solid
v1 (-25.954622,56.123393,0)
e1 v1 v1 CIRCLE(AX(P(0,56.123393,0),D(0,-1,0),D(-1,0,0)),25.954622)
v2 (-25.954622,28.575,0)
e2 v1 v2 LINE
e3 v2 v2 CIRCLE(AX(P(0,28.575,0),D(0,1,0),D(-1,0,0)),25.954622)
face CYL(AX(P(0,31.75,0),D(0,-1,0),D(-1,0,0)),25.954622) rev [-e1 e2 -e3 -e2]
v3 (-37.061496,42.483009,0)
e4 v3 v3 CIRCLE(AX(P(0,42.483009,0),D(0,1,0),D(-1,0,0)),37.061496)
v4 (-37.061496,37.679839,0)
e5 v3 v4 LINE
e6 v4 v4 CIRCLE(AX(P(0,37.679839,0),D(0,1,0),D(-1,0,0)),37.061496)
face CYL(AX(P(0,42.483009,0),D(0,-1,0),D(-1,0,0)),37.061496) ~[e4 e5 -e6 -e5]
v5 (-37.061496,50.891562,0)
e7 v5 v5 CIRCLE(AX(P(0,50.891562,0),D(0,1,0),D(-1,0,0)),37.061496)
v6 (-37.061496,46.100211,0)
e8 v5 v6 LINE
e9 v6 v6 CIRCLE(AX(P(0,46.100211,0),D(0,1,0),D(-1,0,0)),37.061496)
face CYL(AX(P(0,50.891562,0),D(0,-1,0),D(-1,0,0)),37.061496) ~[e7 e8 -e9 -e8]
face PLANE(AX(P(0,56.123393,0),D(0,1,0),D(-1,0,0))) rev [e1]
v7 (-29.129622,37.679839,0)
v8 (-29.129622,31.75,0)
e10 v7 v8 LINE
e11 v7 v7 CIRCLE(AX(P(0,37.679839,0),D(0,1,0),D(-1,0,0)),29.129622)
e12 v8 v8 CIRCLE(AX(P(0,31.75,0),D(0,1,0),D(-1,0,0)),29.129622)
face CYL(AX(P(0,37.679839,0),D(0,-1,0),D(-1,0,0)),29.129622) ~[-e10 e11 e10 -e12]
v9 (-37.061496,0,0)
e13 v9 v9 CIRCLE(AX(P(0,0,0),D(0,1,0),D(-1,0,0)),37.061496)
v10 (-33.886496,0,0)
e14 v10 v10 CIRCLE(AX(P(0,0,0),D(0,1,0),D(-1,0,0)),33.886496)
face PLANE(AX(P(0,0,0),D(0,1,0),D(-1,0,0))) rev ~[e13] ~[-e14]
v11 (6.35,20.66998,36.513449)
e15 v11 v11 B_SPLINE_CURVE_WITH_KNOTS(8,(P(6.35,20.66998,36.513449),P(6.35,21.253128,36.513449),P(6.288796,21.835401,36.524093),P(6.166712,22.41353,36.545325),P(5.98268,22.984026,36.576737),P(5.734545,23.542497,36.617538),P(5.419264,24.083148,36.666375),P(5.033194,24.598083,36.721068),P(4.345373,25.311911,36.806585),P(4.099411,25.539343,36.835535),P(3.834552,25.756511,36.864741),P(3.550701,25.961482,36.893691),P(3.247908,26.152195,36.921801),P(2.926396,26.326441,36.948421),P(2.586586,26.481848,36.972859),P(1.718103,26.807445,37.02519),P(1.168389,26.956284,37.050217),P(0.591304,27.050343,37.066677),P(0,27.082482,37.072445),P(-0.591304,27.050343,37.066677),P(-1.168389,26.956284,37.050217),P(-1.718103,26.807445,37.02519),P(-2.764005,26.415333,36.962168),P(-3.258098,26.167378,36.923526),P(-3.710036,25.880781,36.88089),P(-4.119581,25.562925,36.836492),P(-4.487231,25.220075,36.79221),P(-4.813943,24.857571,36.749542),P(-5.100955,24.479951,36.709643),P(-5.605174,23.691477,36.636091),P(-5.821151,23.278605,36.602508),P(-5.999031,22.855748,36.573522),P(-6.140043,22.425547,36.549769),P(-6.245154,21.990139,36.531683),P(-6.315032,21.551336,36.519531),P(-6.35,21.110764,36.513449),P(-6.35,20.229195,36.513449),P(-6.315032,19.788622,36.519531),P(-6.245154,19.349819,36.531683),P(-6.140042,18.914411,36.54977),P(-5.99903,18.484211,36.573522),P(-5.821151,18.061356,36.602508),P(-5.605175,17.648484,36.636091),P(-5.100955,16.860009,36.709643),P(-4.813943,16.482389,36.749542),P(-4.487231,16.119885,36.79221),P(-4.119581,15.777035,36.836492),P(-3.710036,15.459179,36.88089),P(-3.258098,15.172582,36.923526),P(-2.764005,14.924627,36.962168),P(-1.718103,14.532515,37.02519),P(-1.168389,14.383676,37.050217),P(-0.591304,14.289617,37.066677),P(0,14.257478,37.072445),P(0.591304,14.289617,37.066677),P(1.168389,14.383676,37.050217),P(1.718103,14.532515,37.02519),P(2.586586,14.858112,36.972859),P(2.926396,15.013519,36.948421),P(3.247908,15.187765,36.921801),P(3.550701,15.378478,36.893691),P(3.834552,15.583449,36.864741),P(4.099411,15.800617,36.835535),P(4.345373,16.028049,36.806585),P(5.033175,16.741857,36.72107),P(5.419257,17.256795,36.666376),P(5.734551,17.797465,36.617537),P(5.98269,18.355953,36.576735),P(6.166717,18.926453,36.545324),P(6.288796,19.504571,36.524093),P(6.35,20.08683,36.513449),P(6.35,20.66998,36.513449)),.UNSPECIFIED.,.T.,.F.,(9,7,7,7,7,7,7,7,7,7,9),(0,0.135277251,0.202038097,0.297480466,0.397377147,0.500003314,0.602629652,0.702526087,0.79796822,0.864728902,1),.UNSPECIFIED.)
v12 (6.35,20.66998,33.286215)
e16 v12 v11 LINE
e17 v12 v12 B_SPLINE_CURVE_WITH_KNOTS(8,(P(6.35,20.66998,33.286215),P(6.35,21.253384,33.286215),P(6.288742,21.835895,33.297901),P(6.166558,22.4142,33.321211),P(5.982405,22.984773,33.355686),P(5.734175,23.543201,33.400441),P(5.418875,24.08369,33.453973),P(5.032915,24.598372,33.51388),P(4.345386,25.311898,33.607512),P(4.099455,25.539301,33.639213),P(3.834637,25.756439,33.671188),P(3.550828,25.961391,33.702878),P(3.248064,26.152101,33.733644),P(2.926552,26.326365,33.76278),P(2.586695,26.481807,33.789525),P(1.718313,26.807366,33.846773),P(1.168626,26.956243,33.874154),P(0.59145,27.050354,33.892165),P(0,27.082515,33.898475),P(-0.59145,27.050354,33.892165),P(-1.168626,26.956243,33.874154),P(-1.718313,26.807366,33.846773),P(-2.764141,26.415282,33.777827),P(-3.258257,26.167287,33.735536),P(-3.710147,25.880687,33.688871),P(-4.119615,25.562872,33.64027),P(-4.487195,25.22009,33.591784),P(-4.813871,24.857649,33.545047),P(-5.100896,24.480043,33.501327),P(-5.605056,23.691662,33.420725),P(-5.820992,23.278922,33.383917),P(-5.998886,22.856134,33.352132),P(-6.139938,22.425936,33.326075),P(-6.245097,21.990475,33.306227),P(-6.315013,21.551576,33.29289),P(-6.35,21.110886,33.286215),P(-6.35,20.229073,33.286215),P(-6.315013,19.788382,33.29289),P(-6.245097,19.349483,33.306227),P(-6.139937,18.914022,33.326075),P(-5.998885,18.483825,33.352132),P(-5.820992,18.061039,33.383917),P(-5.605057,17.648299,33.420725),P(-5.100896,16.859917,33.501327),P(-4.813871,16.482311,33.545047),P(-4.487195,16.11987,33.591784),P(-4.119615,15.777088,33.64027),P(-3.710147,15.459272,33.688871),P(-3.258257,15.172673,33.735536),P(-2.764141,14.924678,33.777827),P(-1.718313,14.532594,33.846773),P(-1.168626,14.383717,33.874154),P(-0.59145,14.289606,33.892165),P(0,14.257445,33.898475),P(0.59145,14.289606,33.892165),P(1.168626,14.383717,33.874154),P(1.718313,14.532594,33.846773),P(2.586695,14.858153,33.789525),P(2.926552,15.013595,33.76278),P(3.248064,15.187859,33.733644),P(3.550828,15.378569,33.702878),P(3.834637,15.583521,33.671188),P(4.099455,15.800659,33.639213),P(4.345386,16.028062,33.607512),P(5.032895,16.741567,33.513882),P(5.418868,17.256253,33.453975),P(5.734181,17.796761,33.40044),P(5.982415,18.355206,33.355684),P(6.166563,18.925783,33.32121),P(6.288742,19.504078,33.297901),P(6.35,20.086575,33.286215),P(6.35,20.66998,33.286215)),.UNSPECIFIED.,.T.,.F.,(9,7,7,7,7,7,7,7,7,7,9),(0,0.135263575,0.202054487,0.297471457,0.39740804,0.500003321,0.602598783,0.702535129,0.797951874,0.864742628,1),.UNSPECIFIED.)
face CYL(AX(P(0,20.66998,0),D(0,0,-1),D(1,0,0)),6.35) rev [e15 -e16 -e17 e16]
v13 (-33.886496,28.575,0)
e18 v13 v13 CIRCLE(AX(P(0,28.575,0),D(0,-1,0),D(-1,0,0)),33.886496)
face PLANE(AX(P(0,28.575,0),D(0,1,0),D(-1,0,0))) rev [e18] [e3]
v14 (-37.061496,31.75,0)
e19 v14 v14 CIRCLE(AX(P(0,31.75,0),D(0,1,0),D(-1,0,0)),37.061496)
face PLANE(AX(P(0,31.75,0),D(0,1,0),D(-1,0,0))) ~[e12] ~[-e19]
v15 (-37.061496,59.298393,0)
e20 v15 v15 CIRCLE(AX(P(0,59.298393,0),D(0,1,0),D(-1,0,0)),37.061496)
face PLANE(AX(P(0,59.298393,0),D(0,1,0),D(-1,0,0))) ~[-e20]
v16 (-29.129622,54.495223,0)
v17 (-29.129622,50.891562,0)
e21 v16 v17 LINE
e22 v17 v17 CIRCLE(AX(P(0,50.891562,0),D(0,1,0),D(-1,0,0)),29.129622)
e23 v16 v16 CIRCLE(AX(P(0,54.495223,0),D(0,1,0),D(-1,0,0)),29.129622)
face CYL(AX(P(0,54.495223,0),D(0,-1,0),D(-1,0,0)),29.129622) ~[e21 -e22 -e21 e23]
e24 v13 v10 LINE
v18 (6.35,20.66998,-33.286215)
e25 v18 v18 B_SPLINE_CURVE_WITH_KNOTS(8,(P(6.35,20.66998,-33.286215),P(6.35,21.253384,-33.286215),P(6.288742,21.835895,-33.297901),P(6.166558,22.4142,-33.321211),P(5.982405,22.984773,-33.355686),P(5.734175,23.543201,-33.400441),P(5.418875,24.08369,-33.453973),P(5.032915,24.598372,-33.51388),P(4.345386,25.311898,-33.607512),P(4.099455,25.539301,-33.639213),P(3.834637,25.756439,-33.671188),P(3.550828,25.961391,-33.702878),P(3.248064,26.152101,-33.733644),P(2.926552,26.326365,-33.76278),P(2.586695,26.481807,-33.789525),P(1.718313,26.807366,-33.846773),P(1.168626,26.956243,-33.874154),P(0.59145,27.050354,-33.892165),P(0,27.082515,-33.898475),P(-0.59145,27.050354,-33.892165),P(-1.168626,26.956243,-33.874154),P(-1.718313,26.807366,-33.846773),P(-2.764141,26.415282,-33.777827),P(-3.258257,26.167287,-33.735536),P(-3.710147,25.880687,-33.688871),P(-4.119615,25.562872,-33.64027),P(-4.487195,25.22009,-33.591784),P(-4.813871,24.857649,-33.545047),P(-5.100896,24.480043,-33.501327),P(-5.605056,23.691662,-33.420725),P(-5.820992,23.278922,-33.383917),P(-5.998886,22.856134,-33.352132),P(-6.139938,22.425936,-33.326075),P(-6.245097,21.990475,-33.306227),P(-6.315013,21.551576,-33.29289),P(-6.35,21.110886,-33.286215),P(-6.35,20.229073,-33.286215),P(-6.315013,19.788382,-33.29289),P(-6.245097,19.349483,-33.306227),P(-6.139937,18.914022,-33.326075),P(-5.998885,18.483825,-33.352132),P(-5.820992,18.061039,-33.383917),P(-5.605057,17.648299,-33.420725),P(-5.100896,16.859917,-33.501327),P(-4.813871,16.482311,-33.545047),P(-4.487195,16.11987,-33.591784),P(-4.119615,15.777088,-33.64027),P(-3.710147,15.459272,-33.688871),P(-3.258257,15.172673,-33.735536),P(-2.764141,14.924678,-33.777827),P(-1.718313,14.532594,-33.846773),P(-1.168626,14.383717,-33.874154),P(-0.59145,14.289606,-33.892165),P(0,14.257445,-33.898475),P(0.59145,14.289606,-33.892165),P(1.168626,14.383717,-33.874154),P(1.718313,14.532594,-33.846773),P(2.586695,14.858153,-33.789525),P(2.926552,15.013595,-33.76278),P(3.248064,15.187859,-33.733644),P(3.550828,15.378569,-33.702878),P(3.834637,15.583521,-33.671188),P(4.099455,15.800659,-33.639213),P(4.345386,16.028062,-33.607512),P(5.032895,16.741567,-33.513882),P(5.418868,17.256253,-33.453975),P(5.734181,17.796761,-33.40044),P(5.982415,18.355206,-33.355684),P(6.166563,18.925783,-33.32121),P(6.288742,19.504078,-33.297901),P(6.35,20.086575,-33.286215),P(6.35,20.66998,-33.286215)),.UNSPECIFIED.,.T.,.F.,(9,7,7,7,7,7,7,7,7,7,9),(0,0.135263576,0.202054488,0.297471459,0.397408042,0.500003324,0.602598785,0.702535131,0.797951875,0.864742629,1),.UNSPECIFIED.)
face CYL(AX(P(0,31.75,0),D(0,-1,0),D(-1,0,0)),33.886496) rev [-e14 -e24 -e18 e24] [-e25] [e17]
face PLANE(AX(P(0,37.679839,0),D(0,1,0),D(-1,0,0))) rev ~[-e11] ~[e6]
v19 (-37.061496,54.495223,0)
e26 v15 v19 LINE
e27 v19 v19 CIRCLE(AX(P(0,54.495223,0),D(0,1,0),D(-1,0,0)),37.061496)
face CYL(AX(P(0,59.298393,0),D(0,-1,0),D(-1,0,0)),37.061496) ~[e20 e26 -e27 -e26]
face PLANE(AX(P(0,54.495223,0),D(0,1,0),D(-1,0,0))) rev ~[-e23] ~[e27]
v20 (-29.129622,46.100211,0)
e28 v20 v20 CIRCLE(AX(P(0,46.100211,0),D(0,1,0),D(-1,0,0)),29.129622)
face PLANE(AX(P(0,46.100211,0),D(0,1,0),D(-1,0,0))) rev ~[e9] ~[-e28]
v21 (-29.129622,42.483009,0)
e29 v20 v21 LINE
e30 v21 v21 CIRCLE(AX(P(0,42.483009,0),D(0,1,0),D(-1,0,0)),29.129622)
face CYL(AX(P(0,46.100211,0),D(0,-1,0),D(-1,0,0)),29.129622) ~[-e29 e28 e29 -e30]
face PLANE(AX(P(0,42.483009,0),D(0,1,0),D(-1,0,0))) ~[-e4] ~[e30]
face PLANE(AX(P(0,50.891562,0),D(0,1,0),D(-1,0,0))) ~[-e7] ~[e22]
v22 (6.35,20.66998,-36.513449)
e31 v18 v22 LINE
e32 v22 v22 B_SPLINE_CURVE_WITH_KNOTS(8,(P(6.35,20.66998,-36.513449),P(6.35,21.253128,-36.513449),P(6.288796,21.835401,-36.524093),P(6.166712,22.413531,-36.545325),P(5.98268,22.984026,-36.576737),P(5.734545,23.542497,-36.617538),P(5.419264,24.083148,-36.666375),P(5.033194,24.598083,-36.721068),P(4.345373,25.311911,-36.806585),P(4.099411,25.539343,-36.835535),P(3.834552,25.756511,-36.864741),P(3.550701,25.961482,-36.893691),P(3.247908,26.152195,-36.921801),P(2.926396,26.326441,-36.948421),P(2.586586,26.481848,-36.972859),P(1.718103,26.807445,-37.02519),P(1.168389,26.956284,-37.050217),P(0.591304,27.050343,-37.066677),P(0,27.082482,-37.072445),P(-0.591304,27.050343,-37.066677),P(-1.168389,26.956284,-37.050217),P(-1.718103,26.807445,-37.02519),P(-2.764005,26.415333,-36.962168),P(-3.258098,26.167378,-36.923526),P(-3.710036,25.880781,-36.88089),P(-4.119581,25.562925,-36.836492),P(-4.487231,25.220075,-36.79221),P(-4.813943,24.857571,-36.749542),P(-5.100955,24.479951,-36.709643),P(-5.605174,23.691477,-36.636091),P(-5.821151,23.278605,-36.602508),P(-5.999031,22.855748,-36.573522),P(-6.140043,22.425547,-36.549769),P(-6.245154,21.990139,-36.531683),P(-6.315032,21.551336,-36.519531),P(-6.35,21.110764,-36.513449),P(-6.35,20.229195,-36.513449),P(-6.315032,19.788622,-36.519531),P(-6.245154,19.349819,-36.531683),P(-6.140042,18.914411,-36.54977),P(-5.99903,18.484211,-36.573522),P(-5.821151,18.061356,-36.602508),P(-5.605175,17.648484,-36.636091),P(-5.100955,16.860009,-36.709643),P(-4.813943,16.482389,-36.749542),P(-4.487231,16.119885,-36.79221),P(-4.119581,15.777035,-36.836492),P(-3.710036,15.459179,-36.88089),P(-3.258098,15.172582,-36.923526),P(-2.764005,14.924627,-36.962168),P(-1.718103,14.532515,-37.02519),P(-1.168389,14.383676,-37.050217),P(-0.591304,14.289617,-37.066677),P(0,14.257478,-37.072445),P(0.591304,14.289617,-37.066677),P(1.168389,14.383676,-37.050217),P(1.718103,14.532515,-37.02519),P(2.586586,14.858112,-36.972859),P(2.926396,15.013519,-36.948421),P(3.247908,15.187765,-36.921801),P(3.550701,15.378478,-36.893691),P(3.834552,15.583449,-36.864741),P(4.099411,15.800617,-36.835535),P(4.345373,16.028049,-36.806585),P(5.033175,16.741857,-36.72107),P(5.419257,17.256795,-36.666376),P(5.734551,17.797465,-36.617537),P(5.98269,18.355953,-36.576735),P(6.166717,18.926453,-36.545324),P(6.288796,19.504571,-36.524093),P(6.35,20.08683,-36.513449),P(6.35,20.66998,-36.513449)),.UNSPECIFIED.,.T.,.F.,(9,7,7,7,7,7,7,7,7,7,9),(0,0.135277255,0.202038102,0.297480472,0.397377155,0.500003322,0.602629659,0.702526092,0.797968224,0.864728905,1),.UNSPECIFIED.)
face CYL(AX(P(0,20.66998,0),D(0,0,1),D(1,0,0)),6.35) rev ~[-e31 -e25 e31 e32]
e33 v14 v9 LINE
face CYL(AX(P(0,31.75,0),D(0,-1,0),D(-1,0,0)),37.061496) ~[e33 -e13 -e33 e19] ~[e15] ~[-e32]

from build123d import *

# Parameters (mm, degrees)
F2_T     = 3.175
F3_R     = 6.35
F4_DEPTH = 64.008
F5_DEPTH = 104.14


# Not quite as in the source:
# - a shell that OpenCascade refuses in one call is made with other operations: the cavity is built on its own and cut out


with BuildPart() as f1:
    # F0 (on Top) → F1 (revolve)
    with BuildSketch(Plane.XY):
        Polygon((-37.0614958425, 0), (0, 0), (0, 59.2983933481), (-37.0614958425, 59.2983933481), (-37.0614958425, 54.4952234869), (-29.1296224819, 54.4952234869), (-29.1296224819, 50.8915618087), (-37.0614958425, 50.8915618087), (-37.0614958425, 46.1002111902), (-29.1296224819, 46.1002111902), (-29.1296224819, 42.483009196), (-37.0614958425, 42.483009196), (-37.0614958425, 37.6798393348), (-29.1296224819, 37.6798393348), (-29.1296224819, 31.75), (-37.0614958425, 31.75), align=None)
    revolve(axis=Axis((0, 29.649196674, 0), (0, 1, 0)))

    # F2: shell of thickness 3.175, made by hand


with BuildPart() as f2_core1:
    # F2_t2: copy of F1
    add(f1.part)

    # the walls: a layer under each face that stays
    f2_faces = [f2_core1.faces().sort_by_distance(p)[0] for p in [
        (29.1296224819, 34.7149196674, 0),
        (-24.707663895, 31.75, -24.707663895),
        (37.0614958425, 15.875, 0),
        (0, 59.2983933481, 0),
        (37.0614958425, 56.8968084175, 0),
        (24.707663895, 54.4952234869, -24.707663895),
        (29.1296224819, 52.6933926478, 0),
        (-24.707663895, 50.8915618087, -24.707663895),
        (37.0614958425, 48.4958864995, 0),
        (24.707663895, 46.1002111902, -24.707663895),
        (29.1296224819, 44.2916101931, 0),
        (-24.707663895, 42.483009196, -24.707663895),
        (37.0614958425, 40.0814242654, 0),
        (24.707663895, 37.6798393348, -24.707663895),
    ]]
    thicken(f2_faces, amount=-F2_T, mode=Mode.SUBTRACT)

    # F2_s3 → F2_t4 (revolve, cut)
    with BuildSketch(Plane.XY):
        Polygon((-29.1613724819, 37.6480893348), (-25.9546224819, 37.6798393348), (-25.9546224819, 40.8548393348), (-29.1296224819, 40.8548393348), align=None)
    revolve(axis=Axis((0, 37.6798393348, 0), (0, 1, 0)), mode=Mode.SUBTRACT)

    # F2_s5 → F2_t6 (revolve, cut)
    with BuildSketch(Plane.XY):
        Polygon((-29.1613724819, 31.78175), (-25.9546224819, 31.75), (-25.9546224819, 28.575), (-29.1296224819, 28.575), align=None)
    revolve(axis=Axis((0, 31.75, 0), (0, 1, 0)), mode=Mode.SUBTRACT)

    # F2_s7 → F2_t8 (revolve, cut)
    with BuildSketch(Plane.XY):
        Polygon((-29.1613724819, 54.4634734869), (-29.1296224819, 57.6702234869), (-25.9546224819, 57.6702234869), (-25.9546224819, 54.4952234869), align=None)
    revolve(axis=Axis((0, 54.4952234869, 0), (0, 1, 0)), mode=Mode.SUBTRACT)

    # F2_s9 → F2_t10 (revolve, cut)
    with BuildSketch(Plane.XY):
        Polygon((-29.1613724819, 50.9233118087), (-25.9546224819, 50.8915618087), (-25.9546224819, 47.7165618087), (-29.1296224819, 47.7165618087), align=None)
    revolve(axis=Axis((0, 50.8915618087, 0), (0, 1, 0)), mode=Mode.SUBTRACT)

    # F2_s11 → F2_t12 (revolve, cut)
    with BuildSketch(Plane.XY):
        Polygon((-29.1613724819, 46.0684611902), (-29.1296224819, 49.2752111902), (-25.9546224819, 49.2752111902), (-25.9546224819, 46.1002111902), align=None)
    revolve(axis=Axis((0, 46.1002111902, 0), (0, 1, 0)), mode=Mode.SUBTRACT)

    # F2_s13 → F2_t14 (revolve, cut)
    with BuildSketch(Plane.XY):
        Polygon((-29.1613724819, 42.514759196), (-25.9546224819, 42.483009196), (-25.9546224819, 39.308009196), (-29.1296224819, 39.308009196), align=None)
    revolve(axis=Axis((0, 42.483009196, 0), (0, 1, 0)), mode=Mode.SUBTRACT)


with BuildPart() as f1_1:
    add(f1.part)

    # what is left inside the walls is the cavity
    f2_cavity = [f2_core1.part.solids().sort_by_distance(p)[0] for p in [
        (33.854746, 19.05, 0),
    ]]
    add(f2_cavity, mode=Mode.SUBTRACT)

    # F3 (on Top) → F4 (cut)
    with BuildSketch(Plane.XY):
        with Locations((0, 20.6699799746)):
            Circle(F3_R)
    extrude(amount=-F4_DEPTH, mode=Mode.SUBTRACT)

    # F3 (on Top) → F5 (cut)
    with BuildSketch(Plane.XY):
        with Locations((0, 20.6699799746)):
            Circle(F3_R)
    extrude(amount=F5_DEPTH, mode=Mode.SUBTRACT)


solid = f1_1.part
